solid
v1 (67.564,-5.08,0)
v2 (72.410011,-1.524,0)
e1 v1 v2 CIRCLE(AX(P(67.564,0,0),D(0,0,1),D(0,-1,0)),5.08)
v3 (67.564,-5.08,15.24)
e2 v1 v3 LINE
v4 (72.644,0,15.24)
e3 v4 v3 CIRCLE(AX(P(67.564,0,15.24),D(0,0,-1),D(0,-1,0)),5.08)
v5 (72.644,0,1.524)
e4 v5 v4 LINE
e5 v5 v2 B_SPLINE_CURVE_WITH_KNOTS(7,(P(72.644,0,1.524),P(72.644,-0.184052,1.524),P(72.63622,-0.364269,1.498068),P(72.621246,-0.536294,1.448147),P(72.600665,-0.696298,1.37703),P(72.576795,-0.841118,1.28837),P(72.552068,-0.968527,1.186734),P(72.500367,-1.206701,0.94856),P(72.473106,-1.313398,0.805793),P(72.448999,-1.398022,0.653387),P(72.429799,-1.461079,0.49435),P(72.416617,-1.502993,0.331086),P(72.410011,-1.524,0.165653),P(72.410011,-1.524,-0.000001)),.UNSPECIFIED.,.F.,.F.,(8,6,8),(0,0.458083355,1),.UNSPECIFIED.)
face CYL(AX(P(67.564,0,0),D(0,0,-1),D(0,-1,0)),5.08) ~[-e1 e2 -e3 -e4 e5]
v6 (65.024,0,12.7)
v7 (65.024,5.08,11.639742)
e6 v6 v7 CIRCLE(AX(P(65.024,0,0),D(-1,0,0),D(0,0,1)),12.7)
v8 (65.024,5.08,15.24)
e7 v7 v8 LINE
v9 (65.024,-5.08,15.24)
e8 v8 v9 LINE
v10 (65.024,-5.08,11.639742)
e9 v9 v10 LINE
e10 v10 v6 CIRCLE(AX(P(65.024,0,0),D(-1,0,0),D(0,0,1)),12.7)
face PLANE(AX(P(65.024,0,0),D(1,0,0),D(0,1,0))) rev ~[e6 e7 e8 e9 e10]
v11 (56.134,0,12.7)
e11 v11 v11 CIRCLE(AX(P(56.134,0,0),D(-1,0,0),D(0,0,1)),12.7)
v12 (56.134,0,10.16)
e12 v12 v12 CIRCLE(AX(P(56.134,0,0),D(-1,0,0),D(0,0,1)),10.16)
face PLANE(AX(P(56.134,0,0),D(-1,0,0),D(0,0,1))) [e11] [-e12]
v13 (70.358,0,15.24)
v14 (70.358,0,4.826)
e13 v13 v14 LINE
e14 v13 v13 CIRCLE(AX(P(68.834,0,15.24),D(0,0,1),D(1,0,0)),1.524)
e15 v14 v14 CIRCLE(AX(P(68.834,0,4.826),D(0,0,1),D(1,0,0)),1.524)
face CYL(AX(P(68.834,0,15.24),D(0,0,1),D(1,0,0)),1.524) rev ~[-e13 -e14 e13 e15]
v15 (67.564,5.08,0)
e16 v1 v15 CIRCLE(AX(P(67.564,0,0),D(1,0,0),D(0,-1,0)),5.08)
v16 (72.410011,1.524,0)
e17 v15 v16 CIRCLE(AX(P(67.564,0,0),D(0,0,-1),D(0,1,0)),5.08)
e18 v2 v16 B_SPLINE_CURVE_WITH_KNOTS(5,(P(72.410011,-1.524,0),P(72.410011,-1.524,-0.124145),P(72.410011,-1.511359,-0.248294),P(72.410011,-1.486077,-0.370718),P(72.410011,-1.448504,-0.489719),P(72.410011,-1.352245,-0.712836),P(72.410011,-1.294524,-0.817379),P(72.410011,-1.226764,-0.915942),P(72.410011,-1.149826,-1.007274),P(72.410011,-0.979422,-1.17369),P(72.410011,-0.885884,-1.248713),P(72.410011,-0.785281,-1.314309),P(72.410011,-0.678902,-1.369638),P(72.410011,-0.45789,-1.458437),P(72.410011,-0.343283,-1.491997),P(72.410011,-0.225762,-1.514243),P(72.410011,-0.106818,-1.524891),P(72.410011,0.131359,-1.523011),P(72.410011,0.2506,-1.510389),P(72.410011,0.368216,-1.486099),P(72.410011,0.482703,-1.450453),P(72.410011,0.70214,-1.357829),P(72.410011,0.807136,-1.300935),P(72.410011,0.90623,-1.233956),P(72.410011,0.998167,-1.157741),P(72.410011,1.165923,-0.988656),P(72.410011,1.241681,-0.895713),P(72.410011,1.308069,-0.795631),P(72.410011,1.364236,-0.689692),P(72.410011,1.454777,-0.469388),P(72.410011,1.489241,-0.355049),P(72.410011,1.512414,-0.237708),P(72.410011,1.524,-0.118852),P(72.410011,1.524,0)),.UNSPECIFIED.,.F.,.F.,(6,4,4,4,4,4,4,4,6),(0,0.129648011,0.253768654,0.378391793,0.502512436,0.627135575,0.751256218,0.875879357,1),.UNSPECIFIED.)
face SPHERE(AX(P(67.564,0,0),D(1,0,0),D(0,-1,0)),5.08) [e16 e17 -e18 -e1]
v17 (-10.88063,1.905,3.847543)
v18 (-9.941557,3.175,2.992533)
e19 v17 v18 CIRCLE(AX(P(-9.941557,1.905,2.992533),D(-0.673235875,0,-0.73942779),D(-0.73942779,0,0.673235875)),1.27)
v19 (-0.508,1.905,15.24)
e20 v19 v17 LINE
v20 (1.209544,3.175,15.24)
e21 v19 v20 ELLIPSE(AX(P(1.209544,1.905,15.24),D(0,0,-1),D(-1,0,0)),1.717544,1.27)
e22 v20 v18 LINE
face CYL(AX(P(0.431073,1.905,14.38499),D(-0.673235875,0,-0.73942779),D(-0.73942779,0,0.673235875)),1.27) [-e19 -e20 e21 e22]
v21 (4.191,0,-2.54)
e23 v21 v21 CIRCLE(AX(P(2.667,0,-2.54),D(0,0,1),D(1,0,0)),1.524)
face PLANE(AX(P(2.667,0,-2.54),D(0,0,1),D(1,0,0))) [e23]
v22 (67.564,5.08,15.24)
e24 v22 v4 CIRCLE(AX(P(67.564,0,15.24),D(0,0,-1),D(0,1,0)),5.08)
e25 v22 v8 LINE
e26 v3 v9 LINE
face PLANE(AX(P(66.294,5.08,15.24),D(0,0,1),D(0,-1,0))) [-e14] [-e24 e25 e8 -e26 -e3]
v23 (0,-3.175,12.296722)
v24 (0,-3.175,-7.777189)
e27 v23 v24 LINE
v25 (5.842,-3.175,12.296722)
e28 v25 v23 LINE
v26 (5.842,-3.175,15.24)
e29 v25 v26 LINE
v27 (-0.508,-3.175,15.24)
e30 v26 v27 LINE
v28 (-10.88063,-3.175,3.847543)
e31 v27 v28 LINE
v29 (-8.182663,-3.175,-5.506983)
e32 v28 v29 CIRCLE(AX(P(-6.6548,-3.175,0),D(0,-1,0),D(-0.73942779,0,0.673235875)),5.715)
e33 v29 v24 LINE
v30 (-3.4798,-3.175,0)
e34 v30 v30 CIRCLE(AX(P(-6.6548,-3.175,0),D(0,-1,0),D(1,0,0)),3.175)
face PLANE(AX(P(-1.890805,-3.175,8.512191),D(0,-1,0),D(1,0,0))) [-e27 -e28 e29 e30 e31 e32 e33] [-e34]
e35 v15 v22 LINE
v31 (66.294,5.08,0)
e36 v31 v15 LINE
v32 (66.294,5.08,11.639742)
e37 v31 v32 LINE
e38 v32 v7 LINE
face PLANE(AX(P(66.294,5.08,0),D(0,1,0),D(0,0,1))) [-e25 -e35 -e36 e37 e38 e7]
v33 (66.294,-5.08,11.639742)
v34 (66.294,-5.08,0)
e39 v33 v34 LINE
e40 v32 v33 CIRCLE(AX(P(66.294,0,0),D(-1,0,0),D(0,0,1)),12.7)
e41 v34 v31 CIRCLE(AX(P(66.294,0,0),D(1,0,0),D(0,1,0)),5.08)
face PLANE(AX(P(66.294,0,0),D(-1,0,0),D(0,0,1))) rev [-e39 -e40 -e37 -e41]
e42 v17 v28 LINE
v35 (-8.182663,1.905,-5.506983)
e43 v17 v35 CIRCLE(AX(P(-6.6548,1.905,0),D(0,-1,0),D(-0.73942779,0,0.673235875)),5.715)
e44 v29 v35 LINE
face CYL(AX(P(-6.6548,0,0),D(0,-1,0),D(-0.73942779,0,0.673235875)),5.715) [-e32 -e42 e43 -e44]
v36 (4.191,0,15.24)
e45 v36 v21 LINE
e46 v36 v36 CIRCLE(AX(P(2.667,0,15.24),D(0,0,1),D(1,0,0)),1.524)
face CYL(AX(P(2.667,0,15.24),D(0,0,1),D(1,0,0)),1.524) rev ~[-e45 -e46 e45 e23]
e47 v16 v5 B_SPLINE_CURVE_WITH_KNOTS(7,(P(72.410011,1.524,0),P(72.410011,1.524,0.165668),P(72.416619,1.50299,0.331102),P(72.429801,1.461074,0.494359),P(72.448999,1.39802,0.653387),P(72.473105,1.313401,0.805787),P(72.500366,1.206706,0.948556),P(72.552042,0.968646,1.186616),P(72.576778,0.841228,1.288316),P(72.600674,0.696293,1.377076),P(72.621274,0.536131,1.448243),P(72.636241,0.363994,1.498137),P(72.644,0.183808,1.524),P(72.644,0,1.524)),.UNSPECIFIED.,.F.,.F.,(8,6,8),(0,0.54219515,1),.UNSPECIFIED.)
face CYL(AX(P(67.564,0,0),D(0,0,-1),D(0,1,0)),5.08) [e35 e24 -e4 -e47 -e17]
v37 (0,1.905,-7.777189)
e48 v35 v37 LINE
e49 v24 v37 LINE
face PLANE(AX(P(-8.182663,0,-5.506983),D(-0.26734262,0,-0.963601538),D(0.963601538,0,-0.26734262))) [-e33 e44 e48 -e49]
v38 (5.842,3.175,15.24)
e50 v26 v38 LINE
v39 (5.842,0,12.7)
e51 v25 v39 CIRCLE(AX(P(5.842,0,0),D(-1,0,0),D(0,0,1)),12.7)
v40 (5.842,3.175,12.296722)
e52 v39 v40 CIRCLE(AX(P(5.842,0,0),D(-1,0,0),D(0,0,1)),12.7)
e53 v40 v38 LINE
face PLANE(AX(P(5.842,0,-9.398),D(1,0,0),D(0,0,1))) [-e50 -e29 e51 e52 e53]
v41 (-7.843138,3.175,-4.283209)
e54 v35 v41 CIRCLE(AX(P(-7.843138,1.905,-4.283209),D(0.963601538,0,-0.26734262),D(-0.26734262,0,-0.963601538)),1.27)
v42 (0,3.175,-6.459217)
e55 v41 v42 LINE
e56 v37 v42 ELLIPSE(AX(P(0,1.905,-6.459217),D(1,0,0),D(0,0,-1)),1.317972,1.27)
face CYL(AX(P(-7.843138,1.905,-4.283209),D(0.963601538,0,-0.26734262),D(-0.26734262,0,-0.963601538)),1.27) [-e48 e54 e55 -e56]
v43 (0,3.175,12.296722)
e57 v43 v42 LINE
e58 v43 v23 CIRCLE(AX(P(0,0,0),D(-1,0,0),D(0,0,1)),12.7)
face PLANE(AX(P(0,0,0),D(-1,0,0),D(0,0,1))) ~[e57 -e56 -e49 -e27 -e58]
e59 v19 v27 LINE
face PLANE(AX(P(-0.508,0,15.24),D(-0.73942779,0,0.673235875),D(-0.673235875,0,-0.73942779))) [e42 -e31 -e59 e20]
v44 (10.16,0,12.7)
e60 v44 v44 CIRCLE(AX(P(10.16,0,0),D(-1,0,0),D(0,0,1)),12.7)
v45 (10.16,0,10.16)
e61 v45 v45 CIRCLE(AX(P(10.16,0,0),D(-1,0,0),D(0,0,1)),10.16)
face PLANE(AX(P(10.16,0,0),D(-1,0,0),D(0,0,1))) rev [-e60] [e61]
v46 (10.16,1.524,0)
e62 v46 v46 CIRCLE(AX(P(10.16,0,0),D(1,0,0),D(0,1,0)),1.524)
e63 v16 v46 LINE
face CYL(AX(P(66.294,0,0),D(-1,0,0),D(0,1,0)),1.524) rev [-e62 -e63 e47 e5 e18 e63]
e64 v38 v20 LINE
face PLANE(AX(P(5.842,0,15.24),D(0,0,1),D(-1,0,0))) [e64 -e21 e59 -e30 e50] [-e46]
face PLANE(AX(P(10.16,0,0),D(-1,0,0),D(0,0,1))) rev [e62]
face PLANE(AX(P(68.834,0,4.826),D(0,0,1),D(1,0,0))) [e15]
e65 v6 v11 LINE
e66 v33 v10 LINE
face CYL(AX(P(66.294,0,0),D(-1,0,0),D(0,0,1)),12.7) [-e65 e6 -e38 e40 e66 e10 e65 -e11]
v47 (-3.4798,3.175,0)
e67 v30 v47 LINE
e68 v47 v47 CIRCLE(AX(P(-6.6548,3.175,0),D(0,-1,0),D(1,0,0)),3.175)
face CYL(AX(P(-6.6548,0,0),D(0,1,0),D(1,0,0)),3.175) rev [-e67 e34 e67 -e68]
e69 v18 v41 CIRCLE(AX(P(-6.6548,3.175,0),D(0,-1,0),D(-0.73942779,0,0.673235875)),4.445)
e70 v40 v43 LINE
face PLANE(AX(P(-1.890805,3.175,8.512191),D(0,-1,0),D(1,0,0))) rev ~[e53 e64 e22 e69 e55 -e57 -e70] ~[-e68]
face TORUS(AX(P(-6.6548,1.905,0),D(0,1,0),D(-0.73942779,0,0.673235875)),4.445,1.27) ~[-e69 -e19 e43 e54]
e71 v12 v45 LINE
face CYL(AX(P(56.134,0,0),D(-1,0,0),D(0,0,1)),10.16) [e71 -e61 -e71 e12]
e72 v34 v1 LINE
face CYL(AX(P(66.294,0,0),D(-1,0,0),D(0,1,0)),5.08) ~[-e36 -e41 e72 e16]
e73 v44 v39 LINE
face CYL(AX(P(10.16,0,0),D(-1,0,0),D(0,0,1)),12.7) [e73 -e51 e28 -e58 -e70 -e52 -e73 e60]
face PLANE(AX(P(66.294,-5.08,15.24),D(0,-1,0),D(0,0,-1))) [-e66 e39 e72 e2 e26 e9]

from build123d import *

# Parameters (mm, degrees)
F0_W          = 5.842
F0_H          = 12.7
F0_R          = 3.175
F2_DEPTH      = 3.175
F3_R          = 1.524
F4_DEPTH      = 6.35
F4_DEPTH_BACK = 1.27
F5_R          = 1.524
F6_DEPTH      = 10.414
F7_R          = 1.524
F8_DEPTH      = 17.78
F9_DEPTH      = 56.134
F10_R         = 1.27
F11_T1_DEPTH  = 27.94
F11_T4_ANGLE  = 180


# Not quite as in the source:
# - a fillet or chamfer that OpenCascade refuses, or shapes differently, is made with other operations: its cross-section is extruded or revolved along the edge and cut away or added


with BuildPart() as f1:
    # F0 (on Front) → F1 (revolve)
    with BuildSketch(Plane.XZ):
        Polygon((5.842, 12.7), (5.842, 0), (66.294, 0), (66.294, 12.7), (56.134, 12.7), (56.134, 10.16), (10.16, 10.16), (10.16, 12.7), align=None)
        with Locations((2.921, 6.35)):
            Rectangle(F0_W, F0_H)
    revolve(axis=Axis((33.147, 0, 0), (-1, 0, 0)))

    # F0 (on Front) → F2 (join, symmetric)
    with BuildSketch(Plane.XZ):
        with BuildLine():
            Line((-0.9398, 0), (0, 0))
            Line((0, 0), (0, 12.7))
            Line((0, 12.7), (5.842, 12.7))
            Line((5.842, 12.7), (5.842, 15.24))
            Line((5.842, 15.24), (-0.508, 15.24))
            Line((-0.508, 15.24), (-10.8806298187, 3.8475430269))
            ThreePointArc((-10.8806298187, 3.8475430269), (-4.5919612295, 5.3297205562), (-0.9398, 0))
        make_face()
        with Locations((2.921, 6.35)):
            Rectangle(F0_W, F0_H)
        with BuildLine():
            Line((5.842, 0), (0, 0))
            Line((0, 0), (-0.9398, 0))
            ThreePointArc((-0.9398, 0), (-3.1957909266, -4.5493385486), (-8.1826630726, -5.5069827884))
            Line((-8.1826630726, -5.5069827884), (5.842, -9.398))
            Line((5.842, -9.398), (5.842, 0))
        make_face()
        with BuildLine():
            ThreePointArc((-8.1826630726, -5.5069827884), (-3.1957909266, -4.5493385486), (-0.9398, 0))
            ThreePointArc((-0.9398, 0), (-4.5919612295, 5.3297205562), (-10.8806298187, 3.8475430269))
            ThreePointArc((-10.8806298187, 3.8475430269), (-12.1459778134, -1.5837270034), (-8.1826630726, -5.5069827884))
        make_face()
        with Locations((-6.6548, 0)):
            Circle(F0_R, mode=Mode.SUBTRACT)
    extrude(amount=F2_DEPTH, both=True)

    # F3 (on face) → F4 (join, two sides)
    with BuildSketch(Plane.YZ.offset(66.294)) as f4_sk:
        with BuildLine():
            ThreePointArc((-5.08, 0), (0, -5.08), (5.08, 0))
            ThreePointArc((5.08, 0), (0, 5.08), (-5.08, 0))
        make_face()
        Circle(F3_R, mode=Mode.SUBTRACT)
        with BuildLine():
            ThreePointArc((-5.08, 0), (0, 5.08), (5.08, 0))
            Line((5.08, 0), (5.08, 15.24))
            Line((5.08, 15.24), (-5.08, 15.24))
            Line((-5.08, 15.24), (-5.08, 0))
        make_face()
    extrude(amount=F4_DEPTH)
    extrude(f4_sk.sketch, amount=-F4_DEPTH_BACK)

    # F5 (on face) → F6 (cut)
    with BuildSketch(Plane.XY.offset(15.24)):
        with Locations((68.834, 0)):
            Circle(F5_R)
    extrude(amount=-F6_DEPTH, mode=Mode.SUBTRACT)

    # F7 (on face) → F8 (cut)
    with BuildSketch(Plane.XY.offset(15.24)):
        with Locations((2.667, 0)):
            Circle(F7_R)
    extrude(amount=-F8_DEPTH, mode=Mode.SUBTRACT)

    # F9 (cut, through all): a face of the model
    f9_faces = [f1.faces().sort_by_distance(p)[0] for p in [
        (66.294, 0, 0),
    ]]
    extrude(f9_faces, amount=-F9_DEPTH, mode=Mode.SUBTRACT)

    # F10
    f10_edges = [f1.edges().sort_by_distance(p)[0] for p in [
        (-12.145978, 3.175, -1.583727),
        (-5.694315, 3.175, 9.543772),
    ]]
    fillet(f10_edges, radius=F10_R)

    # F11: fillet of radius 5.08 on 2 edges, made by hand

    # F11_s2 → F11_t1 (cut)
    with BuildSketch(Plane.XY):
        with BuildLine():
            ThreePointArc((67.564, -5.08), (71.1561024484, -3.5921024484), (72.644, 0))
            Line((72.644, 0), (72.644, -5.08))
            Line((72.644, -5.08), (67.564, -5.08))
        make_face()
        with BuildLine():
            ThreePointArc((67.564, 5.08), (71.1561024484, 3.5921024484), (72.644, 0))
            Line((72.644, 0), (72.644, 5.08))
            Line((72.644, 5.08), (67.564, 5.08))
        make_face()
    extrude(amount=F11_T1_DEPTH, mode=Mode.SUBTRACT)

    # F11_s3 → F11_t4 (revolve, cut)
    with BuildSketch(Plane.XY):
        with BuildLine():
            ThreePointArc((67.564, -5.08), (71.1561024484, -3.5921024484), (72.644, 0))
            Line((72.644, 0), (72.644, -5.08))
            Line((72.644, -5.08), (67.564, -5.08))
        make_face()
    revolve(axis=Axis((72.644, 0, 0), (1, 0, 0)), revolution_arc=F11_T4_ANGLE, mode=Mode.SUBTRACT)


solid = f1.part
